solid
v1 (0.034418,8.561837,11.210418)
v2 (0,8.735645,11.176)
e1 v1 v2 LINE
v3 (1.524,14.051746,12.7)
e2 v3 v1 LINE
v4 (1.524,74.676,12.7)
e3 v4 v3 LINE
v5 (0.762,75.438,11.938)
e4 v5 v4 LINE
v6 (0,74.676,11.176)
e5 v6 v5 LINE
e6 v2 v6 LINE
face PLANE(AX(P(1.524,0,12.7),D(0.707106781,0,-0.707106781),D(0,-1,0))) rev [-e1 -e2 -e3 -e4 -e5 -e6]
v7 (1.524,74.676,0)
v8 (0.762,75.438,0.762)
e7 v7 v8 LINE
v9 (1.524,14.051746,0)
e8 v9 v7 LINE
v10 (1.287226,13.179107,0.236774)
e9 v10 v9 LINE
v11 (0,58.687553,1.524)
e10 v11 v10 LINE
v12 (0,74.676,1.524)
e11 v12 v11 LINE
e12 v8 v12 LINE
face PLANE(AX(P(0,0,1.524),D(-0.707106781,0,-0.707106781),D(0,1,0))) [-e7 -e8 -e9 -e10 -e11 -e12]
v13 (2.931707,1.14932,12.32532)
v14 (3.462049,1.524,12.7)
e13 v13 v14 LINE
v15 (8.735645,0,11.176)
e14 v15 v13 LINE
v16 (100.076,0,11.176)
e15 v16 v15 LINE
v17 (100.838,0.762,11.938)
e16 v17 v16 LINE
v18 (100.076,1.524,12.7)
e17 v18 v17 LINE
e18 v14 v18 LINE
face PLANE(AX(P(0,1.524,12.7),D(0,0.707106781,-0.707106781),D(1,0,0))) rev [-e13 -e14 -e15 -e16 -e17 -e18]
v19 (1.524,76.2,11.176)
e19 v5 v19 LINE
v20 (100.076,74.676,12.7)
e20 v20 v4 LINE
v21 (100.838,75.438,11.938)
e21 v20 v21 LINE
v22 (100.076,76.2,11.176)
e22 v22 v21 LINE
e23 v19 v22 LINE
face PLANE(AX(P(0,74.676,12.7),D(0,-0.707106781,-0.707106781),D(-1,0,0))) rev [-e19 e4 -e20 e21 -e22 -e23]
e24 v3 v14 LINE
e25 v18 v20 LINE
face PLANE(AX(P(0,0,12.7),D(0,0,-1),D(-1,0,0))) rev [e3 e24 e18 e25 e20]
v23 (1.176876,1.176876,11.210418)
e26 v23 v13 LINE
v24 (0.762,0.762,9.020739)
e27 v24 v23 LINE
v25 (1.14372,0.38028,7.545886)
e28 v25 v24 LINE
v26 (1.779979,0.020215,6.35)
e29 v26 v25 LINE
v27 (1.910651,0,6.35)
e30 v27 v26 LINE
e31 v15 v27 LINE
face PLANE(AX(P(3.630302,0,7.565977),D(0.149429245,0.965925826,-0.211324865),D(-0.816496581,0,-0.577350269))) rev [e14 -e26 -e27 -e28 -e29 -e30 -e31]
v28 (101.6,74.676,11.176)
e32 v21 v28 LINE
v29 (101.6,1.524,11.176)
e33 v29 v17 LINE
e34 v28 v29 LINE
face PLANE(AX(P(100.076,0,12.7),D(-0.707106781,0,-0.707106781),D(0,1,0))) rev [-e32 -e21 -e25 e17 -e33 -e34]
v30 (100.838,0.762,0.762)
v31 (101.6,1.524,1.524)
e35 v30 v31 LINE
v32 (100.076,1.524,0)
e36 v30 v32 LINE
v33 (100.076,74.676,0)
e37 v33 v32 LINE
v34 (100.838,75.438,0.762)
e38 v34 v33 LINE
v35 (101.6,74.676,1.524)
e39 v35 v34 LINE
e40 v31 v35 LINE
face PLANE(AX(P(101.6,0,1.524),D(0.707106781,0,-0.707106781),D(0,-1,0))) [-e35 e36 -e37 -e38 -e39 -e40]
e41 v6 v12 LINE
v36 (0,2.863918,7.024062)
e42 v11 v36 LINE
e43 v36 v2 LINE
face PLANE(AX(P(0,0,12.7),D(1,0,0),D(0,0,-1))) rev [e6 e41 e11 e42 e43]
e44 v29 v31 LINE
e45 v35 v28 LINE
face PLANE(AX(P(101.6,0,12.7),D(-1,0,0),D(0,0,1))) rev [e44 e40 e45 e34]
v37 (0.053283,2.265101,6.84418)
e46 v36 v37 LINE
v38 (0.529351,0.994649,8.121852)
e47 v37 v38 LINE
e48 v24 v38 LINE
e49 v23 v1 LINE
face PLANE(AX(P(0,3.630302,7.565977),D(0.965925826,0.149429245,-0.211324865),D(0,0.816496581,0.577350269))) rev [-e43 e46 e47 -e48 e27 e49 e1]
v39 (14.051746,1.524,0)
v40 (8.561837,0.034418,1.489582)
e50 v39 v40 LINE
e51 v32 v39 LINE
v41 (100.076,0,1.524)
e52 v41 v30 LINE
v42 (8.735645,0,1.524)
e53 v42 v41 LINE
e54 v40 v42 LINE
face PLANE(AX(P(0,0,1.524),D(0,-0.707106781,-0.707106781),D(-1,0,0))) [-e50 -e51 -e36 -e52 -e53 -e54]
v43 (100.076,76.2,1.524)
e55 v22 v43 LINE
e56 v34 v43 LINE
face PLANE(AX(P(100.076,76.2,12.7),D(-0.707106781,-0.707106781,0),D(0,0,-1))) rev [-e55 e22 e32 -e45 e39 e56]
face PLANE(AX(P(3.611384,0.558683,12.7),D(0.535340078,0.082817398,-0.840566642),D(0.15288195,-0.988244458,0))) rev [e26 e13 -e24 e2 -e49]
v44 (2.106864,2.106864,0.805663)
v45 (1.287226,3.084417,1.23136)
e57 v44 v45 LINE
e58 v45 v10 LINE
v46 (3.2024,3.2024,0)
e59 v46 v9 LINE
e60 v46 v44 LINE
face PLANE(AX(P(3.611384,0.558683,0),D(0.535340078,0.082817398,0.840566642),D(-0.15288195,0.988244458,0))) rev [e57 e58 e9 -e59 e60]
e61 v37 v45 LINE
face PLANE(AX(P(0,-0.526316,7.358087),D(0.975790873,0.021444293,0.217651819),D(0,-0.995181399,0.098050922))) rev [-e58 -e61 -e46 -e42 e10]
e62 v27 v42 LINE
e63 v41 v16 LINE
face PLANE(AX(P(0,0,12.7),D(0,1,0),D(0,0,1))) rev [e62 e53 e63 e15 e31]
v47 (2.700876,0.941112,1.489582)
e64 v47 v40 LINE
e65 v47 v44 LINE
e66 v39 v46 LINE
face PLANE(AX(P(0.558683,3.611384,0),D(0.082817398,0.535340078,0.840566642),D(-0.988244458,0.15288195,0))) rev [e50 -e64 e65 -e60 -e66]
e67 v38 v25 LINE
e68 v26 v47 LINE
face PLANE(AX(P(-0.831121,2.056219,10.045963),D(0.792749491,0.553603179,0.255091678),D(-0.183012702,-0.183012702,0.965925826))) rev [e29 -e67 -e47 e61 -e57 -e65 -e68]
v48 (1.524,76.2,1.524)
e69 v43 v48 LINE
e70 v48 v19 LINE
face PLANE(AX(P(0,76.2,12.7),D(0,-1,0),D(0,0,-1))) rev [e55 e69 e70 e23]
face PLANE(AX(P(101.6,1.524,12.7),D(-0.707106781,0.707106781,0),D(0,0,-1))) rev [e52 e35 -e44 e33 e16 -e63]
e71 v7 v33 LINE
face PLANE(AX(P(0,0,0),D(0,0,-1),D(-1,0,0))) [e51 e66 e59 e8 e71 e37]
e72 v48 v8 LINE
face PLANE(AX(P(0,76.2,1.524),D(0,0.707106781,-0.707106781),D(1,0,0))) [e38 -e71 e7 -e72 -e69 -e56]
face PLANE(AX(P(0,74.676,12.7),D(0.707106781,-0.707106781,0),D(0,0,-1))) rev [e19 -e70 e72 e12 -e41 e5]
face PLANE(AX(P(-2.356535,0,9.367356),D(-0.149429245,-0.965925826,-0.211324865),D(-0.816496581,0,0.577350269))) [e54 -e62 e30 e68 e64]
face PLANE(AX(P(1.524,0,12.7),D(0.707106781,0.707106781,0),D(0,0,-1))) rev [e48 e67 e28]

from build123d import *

# Parameters (mm, degrees)
SKETCH1_W        = 101.6
SKETCH1_H        = 76.2
PLATE_DEPTH      = 12.7
CHAMFER1_SIZE    = 1.524
CHAMFER3_SIZE    = 1.524
CHAMFER5_SIZE    = 1.524
CHAMFER7_SIZE    = 1.524
CHAMFER7_SIZE2   = 4.163645431
CHAMFER9_SIZE    = 1.524
CHAMFER9_SIZE2   = 4.163645431
CHAMFER10_SIZE   = 1.524
CHAMFER10_SIZE2  = 4.163645431
CHAMFER11_SIZE   = 1.524
CHAMFER11_SIZE2  = 1.98931977
CHAMFER12_SIZE   = 1.524
CHAMFER12_SIZE2  = 1.98931977
CHAMFER14_SIZE   = 1.524
CHAMFER14_SIZE2  = 2.500509831
CHAMFER18_SIZE   = 1.524
CHAMFER18_SIZE2  = 1.98931977
CHAMFER19_SIZE   = 4.927310365
CHAMFER19_SIZE_2 = 1.524
CHAMFER27_SIZE   = 4.163645431
CHAMFER27_SIZE_2 = 1.524
CHAMFER29_SIZE   = 1.524
CHAMFER33_SIZE   = 1.524
CHAMFER37_SIZE   = 1.524
CHAMFER41_SIZE   = 1.524
CHAMFER43_SIZE   = 1.524
CHAMFER47_SIZE   = 1.524
CHAMFER52_SIZE   = 1.524
CHAMFER57_SIZE   = 1.524
CHAMFER59_SIZE   = 1.524
CHAMFER63_SIZE   = 1.524
CHAMFER68_SIZE   = 1.524


with BuildPart() as part:
    # Sketch1 → plate (new body)
    with BuildSketch(Plane.XY):
        with Locations((50.8, 38.1)):
            Rectangle(SKETCH1_W, SKETCH1_H)
    extrude(amount=PLATE_DEPTH)

    # Chamfer1
    chamfer1_edges = [part.edges().sort_by_distance(p)[0] for p in [
        (0, 0, 6.35),
    ]]
    chamfer(chamfer1_edges, length=CHAMFER1_SIZE)

    # Chamfer3
    chamfer3_edges = [part.edges().sort_by_distance(p)[0] for p in [
        (0.762, 0.762, 0),
    ]]
    chamfer(chamfer3_edges, length=CHAMFER3_SIZE)

    # Chamfer5
    chamfer5_edges = [part.edges().sort_by_distance(p)[0] for p in [
        (0.762, 0.762, 12.7),
    ]]
    chamfer(chamfer5_edges, length=CHAMFER5_SIZE)

    # Chamfer7
    chamfer7_edges = [part.edges().sort_by_distance(p)[0] for p in [
        (0, 2.601630735, 0.762),
    ]]
    chamfer7_side = [part.faces().sort_by_distance(p)[0] for p in [
        (1.375210245, 1.375210245, 0.656789755),
    ]]
    chamfer(chamfer7_edges, length=CHAMFER7_SIZE, length2=CHAMFER7_SIZE2, reference=chamfer7_side[0])

    # Chamfer9
    chamfer9_edges = [part.edges().sort_by_distance(p)[0] for p in [
        (2.601630735, 0, 0.762),
    ]]
    chamfer9_side = [part.faces().sort_by_distance(p)[0] for p in [
        (2.111722816, 0.7919001, 0.548459281),
    ]]
    chamfer(chamfer9_edges, length=CHAMFER9_SIZE, length2=CHAMFER9_SIZE2, reference=chamfer9_side[0])

    # Chamfer10
    chamfer10_edges = [part.edges().sort_by_distance(p)[0] for p in [
        (0, 2.601630735, 11.938),
    ]]
    chamfer10_side = [part.faces().sort_by_distance(p)[0] for p in [
        (1.375210245, 1.375210245, 12.043210245),
    ]]
    chamfer(chamfer10_edges, length=CHAMFER10_SIZE, length2=CHAMFER10_SIZE2, reference=chamfer10_side[0])

    # Chamfer11
    chamfer11_edges = [part.edges().sort_by_distance(p)[0] for p in [
        (0.659911358, 6.625172827, 0),
    ]]
    chamfer11_side = [part.faces().sort_by_distance(p)[0] for p in [
        (0.497022665, 4.4128662, 2.308870295),
    ]]
    chamfer(chamfer11_edges, length=CHAMFER11_SIZE, length2=CHAMFER11_SIZE2, reference=chamfer11_side[0])

    # Chamfer12
    chamfer12_edges = [part.edges().sort_by_distance(p)[0] for p in [
        (7.206175842, 0.570029878, 0),
    ]]
    chamfer12_side = [part.faces().sort_by_distance(p)[0] for p in [
        (4.492487224, 0.46863969, 2.38230292),
    ]]
    chamfer(chamfer12_edges, length=CHAMFER12_SIZE, length2=CHAMFER12_SIZE2, reference=chamfer12_side[0])

    # Chamfer14
    chamfer14_edges = [part.edges().sort_by_distance(p)[0] for p in [
        (0.96943787, 0.96943787, 2.584421635),
    ]]
    chamfer14_side = [part.faces().sort_by_distance(p)[0] for p in [
        (3.644155143, 0.409792278, 3.25114463),
    ]]
    chamfer(chamfer14_edges, length=CHAMFER14_SIZE, length2=CHAMFER14_SIZE2, reference=chamfer14_side[0])

    # Chamfer18
    chamfer18_edges = [part.edges().sort_by_distance(p)[0] for p in [
        (0.659911358, 6.625172827, 12.7),
    ]]
    chamfer18_side = [part.faces().sort_by_distance(p)[0] for p in [
        (0.533202333, 4.341451886, 10.506002546),
    ]]
    chamfer(chamfer18_edges, length=CHAMFER18_SIZE, length2=CHAMFER18_SIZE2, reference=chamfer18_side[0])

    # Chamfer19
    # the kernel refuses this chamfer: 4.927310365, 1.524 mm, written as the material it takes off along each edge
    with BuildSketch(Plane(origin=(0, -3.953536059, 2.744587717), x_dir=(0, 0.09805092210800737, 0.9951813988785008), z_dir=(0, 0.9951813988785007, -0.09805092210800735))) as chamfer19_piece_1:
        Polygon((CHAMFER19_SIZE, 0), (-CHAMFER19_SIZE_2 * 0.53534007825, CHAMFER19_SIZE_2 * 0.844636608619), (0, 0), align=None)
    extrude(amount=91.989112447, mode=Mode.SUBTRACT)

    # Chamfer27
    # the kernel refuses this chamfer: 4.163645431, 1.524 mm, written as the material it takes off along each edge
    with BuildSketch(Plane(origin=(-7.303820514, 0, 4.933788251), x_dir=(0.5773502691896255, 0, -0.8164965809277261), z_dir=(0.8164965809277263, 0, 0.5773502691896256))) as chamfer27_piece_1:
        Polygon((CHAMFER27_SIZE, 0), (-CHAMFER27_SIZE_2 * 0.5, CHAMFER27_SIZE_2 * 0.866025403784), (0, 0), align=None)
    extrude(amount=24.057251609, mode=Mode.SUBTRACT)

    # Chamfer29
    chamfer29_edges = [part.edges().sort_by_distance(p)[0] for p in [
        (101.6, 0, 6.35),
    ]]
    chamfer(chamfer29_edges, length=CHAMFER29_SIZE)

    # Chamfer33
    chamfer33_edges = [part.edges().sort_by_distance(p)[0] for p in [
        (101.6, 76.2, 6.35),
    ]]
    chamfer(chamfer33_edges, length=CHAMFER33_SIZE)

    # Chamfer37
    chamfer37_edges = [part.edges().sort_by_distance(p)[0] for p in [
        (0, 76.2, 6.35),
    ]]
    chamfer(chamfer37_edges, length=CHAMFER37_SIZE)

    # Chamfer41
    chamfer41_edges = [part.edges().sort_by_distance(p)[0] for p in [
        (50.8, 76.2, 12.7),
    ]]
    chamfer(chamfer41_edges, length=CHAMFER41_SIZE)

    # Chamfer43
    chamfer43_edges = [part.edges().sort_by_distance(p)[0] for p in [
        (101.6, 38.1, 12.7),
    ]]
    chamfer(chamfer43_edges, length=CHAMFER43_SIZE)

    # Chamfer47
    chamfer47_edges = [part.edges().sort_by_distance(p)[0] for p in [
        (55.48345345, 0, 12.7),
    ]]
    chamfer(chamfer47_edges, length=CHAMFER47_SIZE)

    # Chamfer52
    chamfer52_edges = [part.edges().sort_by_distance(p)[0] for p in [
        (0, 49.289518337, 12.7),
    ]]
    chamfer(chamfer52_edges, length=CHAMFER52_SIZE)

    # Chamfer57
    chamfer57_edges = [part.edges().sort_by_distance(p)[0] for p in [
        (50.8, 76.2, 0),
    ]]
    chamfer(chamfer57_edges, length=CHAMFER57_SIZE)

    # Chamfer59
    chamfer59_edges = [part.edges().sort_by_distance(p)[0] for p in [
        (101.6, 38.1, 0),
    ]]
    chamfer(chamfer59_edges, length=CHAMFER59_SIZE)

    # Chamfer63
    chamfer63_edges = [part.edges().sort_by_distance(p)[0] for p in [
        (61.989518337, 0, 0),
    ]]
    chamfer(chamfer63_edges, length=CHAMFER63_SIZE)

    # Chamfer68
    chamfer68_edges = [part.edges().sort_by_distance(p)[0] for p in [
        (0, 74.415800982, 0),
    ]]
    chamfer(chamfer68_edges, length=CHAMFER68_SIZE)


solid = part.part
